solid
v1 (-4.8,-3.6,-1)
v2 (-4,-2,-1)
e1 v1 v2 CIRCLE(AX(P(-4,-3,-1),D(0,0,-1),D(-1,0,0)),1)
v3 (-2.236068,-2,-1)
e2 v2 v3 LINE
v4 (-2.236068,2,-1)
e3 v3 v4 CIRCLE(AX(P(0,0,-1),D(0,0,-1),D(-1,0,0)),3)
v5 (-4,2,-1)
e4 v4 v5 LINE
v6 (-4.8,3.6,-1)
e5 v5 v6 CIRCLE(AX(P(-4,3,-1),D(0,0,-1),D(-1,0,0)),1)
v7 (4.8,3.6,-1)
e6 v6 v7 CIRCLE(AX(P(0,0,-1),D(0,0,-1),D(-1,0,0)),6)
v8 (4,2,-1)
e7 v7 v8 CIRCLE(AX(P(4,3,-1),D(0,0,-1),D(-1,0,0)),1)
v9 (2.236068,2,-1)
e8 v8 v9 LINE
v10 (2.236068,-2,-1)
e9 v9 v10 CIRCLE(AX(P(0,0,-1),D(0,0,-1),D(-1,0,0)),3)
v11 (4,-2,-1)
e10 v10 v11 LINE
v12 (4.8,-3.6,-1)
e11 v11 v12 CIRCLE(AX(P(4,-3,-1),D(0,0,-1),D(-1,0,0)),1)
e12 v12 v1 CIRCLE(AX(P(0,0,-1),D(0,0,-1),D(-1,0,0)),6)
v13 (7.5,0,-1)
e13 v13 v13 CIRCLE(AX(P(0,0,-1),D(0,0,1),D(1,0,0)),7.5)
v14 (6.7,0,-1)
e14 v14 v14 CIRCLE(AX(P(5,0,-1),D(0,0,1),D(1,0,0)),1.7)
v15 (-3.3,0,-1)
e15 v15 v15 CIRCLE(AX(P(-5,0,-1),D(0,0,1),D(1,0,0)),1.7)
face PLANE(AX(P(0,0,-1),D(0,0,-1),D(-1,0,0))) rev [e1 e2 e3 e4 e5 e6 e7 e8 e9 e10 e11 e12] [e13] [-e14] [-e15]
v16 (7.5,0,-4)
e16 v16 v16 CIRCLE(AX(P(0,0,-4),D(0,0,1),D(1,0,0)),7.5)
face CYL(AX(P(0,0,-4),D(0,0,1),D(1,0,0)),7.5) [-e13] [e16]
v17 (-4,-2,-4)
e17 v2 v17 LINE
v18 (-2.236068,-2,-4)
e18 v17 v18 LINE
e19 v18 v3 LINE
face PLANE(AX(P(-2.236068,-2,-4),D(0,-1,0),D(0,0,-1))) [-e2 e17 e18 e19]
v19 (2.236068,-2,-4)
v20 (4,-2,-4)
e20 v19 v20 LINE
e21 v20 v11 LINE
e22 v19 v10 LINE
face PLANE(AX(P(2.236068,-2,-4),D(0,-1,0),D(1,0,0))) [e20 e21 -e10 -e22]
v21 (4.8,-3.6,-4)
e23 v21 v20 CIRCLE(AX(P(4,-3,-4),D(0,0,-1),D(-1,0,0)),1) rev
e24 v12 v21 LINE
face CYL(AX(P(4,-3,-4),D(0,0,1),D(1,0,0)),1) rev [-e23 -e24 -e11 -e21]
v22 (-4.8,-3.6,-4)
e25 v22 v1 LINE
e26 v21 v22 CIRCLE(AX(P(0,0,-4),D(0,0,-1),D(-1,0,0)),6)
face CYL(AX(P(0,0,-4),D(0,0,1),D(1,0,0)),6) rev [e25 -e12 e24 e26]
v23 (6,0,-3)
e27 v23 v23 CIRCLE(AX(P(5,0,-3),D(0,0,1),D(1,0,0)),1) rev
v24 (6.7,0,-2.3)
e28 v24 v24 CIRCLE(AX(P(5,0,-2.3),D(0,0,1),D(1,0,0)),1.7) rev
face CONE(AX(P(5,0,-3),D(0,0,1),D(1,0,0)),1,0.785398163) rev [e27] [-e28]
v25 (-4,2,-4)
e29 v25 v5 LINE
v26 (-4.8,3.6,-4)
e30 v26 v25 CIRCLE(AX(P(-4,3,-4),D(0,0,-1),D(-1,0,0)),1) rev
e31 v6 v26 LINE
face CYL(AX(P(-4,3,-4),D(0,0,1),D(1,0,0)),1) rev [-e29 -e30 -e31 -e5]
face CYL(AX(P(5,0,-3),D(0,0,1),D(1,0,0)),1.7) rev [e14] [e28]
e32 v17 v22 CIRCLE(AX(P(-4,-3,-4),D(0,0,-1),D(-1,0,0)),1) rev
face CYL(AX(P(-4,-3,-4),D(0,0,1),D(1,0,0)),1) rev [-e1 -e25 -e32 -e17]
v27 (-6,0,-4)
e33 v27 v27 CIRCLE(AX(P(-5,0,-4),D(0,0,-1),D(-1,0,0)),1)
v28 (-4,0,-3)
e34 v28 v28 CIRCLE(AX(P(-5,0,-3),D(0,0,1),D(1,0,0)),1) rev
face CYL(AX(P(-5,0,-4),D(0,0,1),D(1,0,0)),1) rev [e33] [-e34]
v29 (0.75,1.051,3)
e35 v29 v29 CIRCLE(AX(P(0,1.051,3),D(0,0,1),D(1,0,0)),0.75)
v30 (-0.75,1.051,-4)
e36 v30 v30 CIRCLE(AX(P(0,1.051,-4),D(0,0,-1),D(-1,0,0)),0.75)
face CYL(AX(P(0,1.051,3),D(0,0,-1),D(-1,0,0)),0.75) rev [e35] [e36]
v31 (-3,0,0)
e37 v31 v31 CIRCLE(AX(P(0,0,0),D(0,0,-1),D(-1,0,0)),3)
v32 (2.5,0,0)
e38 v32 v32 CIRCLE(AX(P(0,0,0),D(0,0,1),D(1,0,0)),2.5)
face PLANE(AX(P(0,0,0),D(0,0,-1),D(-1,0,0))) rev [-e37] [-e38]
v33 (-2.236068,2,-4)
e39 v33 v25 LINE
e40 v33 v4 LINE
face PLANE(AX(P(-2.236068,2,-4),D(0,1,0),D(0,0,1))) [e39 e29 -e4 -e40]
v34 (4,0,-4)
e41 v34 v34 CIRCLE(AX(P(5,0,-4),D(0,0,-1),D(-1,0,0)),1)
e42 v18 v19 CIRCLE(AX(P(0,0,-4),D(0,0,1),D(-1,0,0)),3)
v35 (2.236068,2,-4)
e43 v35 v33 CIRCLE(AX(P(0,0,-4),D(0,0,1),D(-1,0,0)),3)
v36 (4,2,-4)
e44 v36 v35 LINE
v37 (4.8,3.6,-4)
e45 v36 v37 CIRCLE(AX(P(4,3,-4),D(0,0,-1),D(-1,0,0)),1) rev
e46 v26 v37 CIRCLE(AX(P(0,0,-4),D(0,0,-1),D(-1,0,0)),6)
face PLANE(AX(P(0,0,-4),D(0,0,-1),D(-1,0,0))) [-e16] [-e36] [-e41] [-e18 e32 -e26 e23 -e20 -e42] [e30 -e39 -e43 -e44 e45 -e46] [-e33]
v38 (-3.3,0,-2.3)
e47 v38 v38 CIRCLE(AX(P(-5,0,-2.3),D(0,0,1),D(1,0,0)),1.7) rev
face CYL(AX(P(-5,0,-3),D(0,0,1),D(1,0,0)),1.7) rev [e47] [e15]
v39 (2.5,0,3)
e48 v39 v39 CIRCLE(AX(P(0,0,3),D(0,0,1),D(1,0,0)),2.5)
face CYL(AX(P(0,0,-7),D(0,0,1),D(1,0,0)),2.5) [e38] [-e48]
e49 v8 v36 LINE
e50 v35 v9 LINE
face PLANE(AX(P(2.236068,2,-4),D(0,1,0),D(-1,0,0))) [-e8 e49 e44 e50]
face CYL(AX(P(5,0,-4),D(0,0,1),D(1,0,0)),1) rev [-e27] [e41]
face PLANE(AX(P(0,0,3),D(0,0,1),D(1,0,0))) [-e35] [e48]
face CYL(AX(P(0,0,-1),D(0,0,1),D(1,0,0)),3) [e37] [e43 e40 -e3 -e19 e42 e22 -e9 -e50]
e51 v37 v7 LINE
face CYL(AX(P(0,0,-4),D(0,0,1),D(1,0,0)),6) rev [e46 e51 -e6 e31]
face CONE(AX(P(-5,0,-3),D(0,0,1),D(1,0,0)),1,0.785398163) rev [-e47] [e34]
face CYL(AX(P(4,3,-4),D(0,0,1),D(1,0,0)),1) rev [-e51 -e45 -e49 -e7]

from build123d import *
from build123d.topology import SkipClean

# Parameters (mm, degrees)
SKETCH_1_R          = 5
SKETCH_1_R_2        = 0.75
EXTRUDE_1_DEPTH     = 3
SKETCH_3_R          = 6.372954201
SKETCH_3_R_2        = 2.5
CUT_EXTRUDE_1_DEPTH = 10
EXTRUDE_START       = 1
SKETCH_5_R          = 3
SKETCH_5_R_2        = 0.75
EXTRUDE_3_DEPTH     = 1
EXTRUDE_START_2     = 3
SKETCH_6_R          = 7
SKETCH_6_R_2        = 1
SKETCH_6_R_3        = 0.75
EXTRUDE_4_DEPTH     = 3
FILLET_2_R          = 1
SKETCH_7_R          = 1.5
CUT_EXTRUDE_2_DEPTH = 2
CHAMFER_1_SIZE      = 0.5
SKETCH_8_R          = 1.7
CUT_EXTRUDE_3_DEPTH = 2
CHAMFER_2_SIZE      = 0.7
SKETCH_9_R          = 7.5
SKETCH_9_R_2        = 6.7
EXTRUDE_5_DEPTH     = 3


# Some blends are built 0.0001 mm under size
with BuildPart() as part:
    # 草图1 → 凸台-拉伸1 (new body)
    with BuildSketch(Plane.XY):
        Circle(SKETCH_1_R)
        with Locations((0, 1.051)):
            Circle(SKETCH_1_R_2, mode=Mode.SUBTRACT)
    extrude(amount=EXTRUDE_1_DEPTH)

    # 草图3 → 切除-拉伸1 (cut)
    with BuildSketch(Plane.XY.offset(3)):
        Circle(SKETCH_3_R)
        Circle(SKETCH_3_R_2, mode=Mode.SUBTRACT)
    extrude(amount=-CUT_EXTRUDE_1_DEPTH, mode=Mode.SUBTRACT)

    # 草图5 → 凸台-拉伸3 (add)
    with SkipClean():  # the faces are left unmerged after this step: merging them gives an invalid solid
        with BuildSketch(Plane(origin=(0, 0, 0), x_dir=(-1, 0, 0), z_dir=(0, 0, -1)).offset(EXTRUDE_START)):
            Circle(SKETCH_5_R)
            with Locations((0, 1.051)):
                Circle(SKETCH_5_R_2, mode=Mode.SUBTRACT)
        extrude(amount=-EXTRUDE_3_DEPTH)

    # 草图6 → 凸台-拉伸4 (add)
    with SkipClean():  # the faces are left unmerged after this step: merging them gives an invalid solid
        with BuildSketch(Plane(origin=(0, 0, -1), x_dir=(-1, 0, 0), z_dir=(0, 0, -1)).offset(EXTRUDE_START_2)):
            Circle(SKETCH_6_R)
            with Locations((-5, 0)):
                Circle(SKETCH_6_R_2, mode=Mode.SUBTRACT)
            with Locations((5, 0)):
                Circle(SKETCH_6_R_2, mode=Mode.SUBTRACT)
            with Locations((0, 1.051)):
                Circle(SKETCH_6_R_3, mode=Mode.SUBTRACT)
            with BuildLine():
                Line((2.236067977, 2), (5.656854249, 2))
                ThreePointArc((5.656854249, 2), (0, 6), (-5.656854249, 2))
                Line((-5.656854249, 2), (-2.236067977, 2))
                ThreePointArc((-2.236067977, 2), (0, 3), (2.236067977, 2))
            make_face(mode=Mode.SUBTRACT)
            with BuildLine():
                Line((2.236067977, -2), (5.656854249, -2))
                ThreePointArc((5.656854249, -2), (0, -6), (-5.656854249, -2))
                Line((-5.656854249, -2), (-2.236067977, -2))
                ThreePointArc((-2.236067977, -2), (0, -3), (2.236067977, -2))
            make_face(mode=Mode.SUBTRACT)
        extrude(amount=-EXTRUDE_4_DEPTH)

    # 圆角2
    fillet_2_edges = [part.edges().sort_by_distance(p)[0] for p in [
        (-5.656854249, -2, -2.5),
        (5.656854249, -2, -2.5),
        (-5.656854249, 2, -2.5),
        (5.656854249, 2, -2.5),
    ]]
    fillet(fillet_2_edges, radius=FILLET_2_R)

    # 草图7 → 切除-拉伸2 (cut)
    with BuildSketch(Plane.XY.offset(-1)):
        with Locations((-5, 0)):
            Circle(SKETCH_7_R)
        with Locations((5, 0)):
            Circle(SKETCH_7_R)
    extrude(amount=-CUT_EXTRUDE_2_DEPTH, mode=Mode.SUBTRACT)

    # 倒角1
    chamfer_1_edges = [part.edges().sort_by_distance(p)[0] for p in [
        (-6.5, 0, -3),
        (3.5, 0, -3),
    ]]
    chamfer(chamfer_1_edges, length=CHAMFER_1_SIZE - 0.0001)  # a hair under: the kernel refuses the full size

    # 草图8 → 切除-拉伸3 (cut)
    with BuildSketch(Plane.XY.offset(-1)):
        with Locations((-5, 0)):
            Circle(SKETCH_8_R)
        with Locations((5, 0)):
            Circle(SKETCH_8_R)
    extrude(amount=-CUT_EXTRUDE_3_DEPTH, mode=Mode.SUBTRACT)

    # 倒角2
    # the kernel refuses this chamfer: 0.7 mm, written as the material it adds along each edge
    with BuildSketch(Plane(origin=(-5, 0, -3), x_dir=(1, 0, 0), z_dir=(0, -1, 0))) as chamfer_2_piece_1_section:
        Polygon((1.7, CHAMFER_2_SIZE), (1.7 - CHAMFER_2_SIZE, 0), (1.7, 0), align=None)
    chamfer_2_piece_1 = revolve(axis=Axis((-5, 0, -3), (0, 0, 1)), mode=Mode.PRIVATE)
    chamfer_2_piece_1 = chamfer_2_piece_1 - Plane(origin=(-5, 0, -2.649679333), x_dir=(-1, 0, 0), z_dir=(0, 0, -1)) * Cylinder(1, 7, mode=Mode.PRIVATE)
    add(chamfer_2_piece_1)
    with BuildSketch(Plane(origin=(5, 0, -3), x_dir=(1, 0, 0), z_dir=(0, -1, 0))) as chamfer_2_piece_2_section:
        Polygon((1.7 - CHAMFER_2_SIZE, 0), (1.7, CHAMFER_2_SIZE), (1.7, 0), align=None)
    chamfer_2_piece_2 = revolve(axis=Axis((5, 0, -3), (0, 0, 1)), mode=Mode.PRIVATE)
    chamfer_2_piece_2 = chamfer_2_piece_2 - Plane(origin=(5, 0, -2.649679333), x_dir=(-1, 0, 0), z_dir=(0, 0, -1)) * Cylinder(1, 7, mode=Mode.PRIVATE)
    add(chamfer_2_piece_2)

    # 草图9 → 凸台-拉伸5 (add)
    with BuildSketch(Plane.XY.offset(-1)):
        Circle(SKETCH_9_R)
        Circle(SKETCH_9_R_2, mode=Mode.SUBTRACT)
    extrude(amount=-EXTRUDE_5_DEPTH)


solid = part.part
